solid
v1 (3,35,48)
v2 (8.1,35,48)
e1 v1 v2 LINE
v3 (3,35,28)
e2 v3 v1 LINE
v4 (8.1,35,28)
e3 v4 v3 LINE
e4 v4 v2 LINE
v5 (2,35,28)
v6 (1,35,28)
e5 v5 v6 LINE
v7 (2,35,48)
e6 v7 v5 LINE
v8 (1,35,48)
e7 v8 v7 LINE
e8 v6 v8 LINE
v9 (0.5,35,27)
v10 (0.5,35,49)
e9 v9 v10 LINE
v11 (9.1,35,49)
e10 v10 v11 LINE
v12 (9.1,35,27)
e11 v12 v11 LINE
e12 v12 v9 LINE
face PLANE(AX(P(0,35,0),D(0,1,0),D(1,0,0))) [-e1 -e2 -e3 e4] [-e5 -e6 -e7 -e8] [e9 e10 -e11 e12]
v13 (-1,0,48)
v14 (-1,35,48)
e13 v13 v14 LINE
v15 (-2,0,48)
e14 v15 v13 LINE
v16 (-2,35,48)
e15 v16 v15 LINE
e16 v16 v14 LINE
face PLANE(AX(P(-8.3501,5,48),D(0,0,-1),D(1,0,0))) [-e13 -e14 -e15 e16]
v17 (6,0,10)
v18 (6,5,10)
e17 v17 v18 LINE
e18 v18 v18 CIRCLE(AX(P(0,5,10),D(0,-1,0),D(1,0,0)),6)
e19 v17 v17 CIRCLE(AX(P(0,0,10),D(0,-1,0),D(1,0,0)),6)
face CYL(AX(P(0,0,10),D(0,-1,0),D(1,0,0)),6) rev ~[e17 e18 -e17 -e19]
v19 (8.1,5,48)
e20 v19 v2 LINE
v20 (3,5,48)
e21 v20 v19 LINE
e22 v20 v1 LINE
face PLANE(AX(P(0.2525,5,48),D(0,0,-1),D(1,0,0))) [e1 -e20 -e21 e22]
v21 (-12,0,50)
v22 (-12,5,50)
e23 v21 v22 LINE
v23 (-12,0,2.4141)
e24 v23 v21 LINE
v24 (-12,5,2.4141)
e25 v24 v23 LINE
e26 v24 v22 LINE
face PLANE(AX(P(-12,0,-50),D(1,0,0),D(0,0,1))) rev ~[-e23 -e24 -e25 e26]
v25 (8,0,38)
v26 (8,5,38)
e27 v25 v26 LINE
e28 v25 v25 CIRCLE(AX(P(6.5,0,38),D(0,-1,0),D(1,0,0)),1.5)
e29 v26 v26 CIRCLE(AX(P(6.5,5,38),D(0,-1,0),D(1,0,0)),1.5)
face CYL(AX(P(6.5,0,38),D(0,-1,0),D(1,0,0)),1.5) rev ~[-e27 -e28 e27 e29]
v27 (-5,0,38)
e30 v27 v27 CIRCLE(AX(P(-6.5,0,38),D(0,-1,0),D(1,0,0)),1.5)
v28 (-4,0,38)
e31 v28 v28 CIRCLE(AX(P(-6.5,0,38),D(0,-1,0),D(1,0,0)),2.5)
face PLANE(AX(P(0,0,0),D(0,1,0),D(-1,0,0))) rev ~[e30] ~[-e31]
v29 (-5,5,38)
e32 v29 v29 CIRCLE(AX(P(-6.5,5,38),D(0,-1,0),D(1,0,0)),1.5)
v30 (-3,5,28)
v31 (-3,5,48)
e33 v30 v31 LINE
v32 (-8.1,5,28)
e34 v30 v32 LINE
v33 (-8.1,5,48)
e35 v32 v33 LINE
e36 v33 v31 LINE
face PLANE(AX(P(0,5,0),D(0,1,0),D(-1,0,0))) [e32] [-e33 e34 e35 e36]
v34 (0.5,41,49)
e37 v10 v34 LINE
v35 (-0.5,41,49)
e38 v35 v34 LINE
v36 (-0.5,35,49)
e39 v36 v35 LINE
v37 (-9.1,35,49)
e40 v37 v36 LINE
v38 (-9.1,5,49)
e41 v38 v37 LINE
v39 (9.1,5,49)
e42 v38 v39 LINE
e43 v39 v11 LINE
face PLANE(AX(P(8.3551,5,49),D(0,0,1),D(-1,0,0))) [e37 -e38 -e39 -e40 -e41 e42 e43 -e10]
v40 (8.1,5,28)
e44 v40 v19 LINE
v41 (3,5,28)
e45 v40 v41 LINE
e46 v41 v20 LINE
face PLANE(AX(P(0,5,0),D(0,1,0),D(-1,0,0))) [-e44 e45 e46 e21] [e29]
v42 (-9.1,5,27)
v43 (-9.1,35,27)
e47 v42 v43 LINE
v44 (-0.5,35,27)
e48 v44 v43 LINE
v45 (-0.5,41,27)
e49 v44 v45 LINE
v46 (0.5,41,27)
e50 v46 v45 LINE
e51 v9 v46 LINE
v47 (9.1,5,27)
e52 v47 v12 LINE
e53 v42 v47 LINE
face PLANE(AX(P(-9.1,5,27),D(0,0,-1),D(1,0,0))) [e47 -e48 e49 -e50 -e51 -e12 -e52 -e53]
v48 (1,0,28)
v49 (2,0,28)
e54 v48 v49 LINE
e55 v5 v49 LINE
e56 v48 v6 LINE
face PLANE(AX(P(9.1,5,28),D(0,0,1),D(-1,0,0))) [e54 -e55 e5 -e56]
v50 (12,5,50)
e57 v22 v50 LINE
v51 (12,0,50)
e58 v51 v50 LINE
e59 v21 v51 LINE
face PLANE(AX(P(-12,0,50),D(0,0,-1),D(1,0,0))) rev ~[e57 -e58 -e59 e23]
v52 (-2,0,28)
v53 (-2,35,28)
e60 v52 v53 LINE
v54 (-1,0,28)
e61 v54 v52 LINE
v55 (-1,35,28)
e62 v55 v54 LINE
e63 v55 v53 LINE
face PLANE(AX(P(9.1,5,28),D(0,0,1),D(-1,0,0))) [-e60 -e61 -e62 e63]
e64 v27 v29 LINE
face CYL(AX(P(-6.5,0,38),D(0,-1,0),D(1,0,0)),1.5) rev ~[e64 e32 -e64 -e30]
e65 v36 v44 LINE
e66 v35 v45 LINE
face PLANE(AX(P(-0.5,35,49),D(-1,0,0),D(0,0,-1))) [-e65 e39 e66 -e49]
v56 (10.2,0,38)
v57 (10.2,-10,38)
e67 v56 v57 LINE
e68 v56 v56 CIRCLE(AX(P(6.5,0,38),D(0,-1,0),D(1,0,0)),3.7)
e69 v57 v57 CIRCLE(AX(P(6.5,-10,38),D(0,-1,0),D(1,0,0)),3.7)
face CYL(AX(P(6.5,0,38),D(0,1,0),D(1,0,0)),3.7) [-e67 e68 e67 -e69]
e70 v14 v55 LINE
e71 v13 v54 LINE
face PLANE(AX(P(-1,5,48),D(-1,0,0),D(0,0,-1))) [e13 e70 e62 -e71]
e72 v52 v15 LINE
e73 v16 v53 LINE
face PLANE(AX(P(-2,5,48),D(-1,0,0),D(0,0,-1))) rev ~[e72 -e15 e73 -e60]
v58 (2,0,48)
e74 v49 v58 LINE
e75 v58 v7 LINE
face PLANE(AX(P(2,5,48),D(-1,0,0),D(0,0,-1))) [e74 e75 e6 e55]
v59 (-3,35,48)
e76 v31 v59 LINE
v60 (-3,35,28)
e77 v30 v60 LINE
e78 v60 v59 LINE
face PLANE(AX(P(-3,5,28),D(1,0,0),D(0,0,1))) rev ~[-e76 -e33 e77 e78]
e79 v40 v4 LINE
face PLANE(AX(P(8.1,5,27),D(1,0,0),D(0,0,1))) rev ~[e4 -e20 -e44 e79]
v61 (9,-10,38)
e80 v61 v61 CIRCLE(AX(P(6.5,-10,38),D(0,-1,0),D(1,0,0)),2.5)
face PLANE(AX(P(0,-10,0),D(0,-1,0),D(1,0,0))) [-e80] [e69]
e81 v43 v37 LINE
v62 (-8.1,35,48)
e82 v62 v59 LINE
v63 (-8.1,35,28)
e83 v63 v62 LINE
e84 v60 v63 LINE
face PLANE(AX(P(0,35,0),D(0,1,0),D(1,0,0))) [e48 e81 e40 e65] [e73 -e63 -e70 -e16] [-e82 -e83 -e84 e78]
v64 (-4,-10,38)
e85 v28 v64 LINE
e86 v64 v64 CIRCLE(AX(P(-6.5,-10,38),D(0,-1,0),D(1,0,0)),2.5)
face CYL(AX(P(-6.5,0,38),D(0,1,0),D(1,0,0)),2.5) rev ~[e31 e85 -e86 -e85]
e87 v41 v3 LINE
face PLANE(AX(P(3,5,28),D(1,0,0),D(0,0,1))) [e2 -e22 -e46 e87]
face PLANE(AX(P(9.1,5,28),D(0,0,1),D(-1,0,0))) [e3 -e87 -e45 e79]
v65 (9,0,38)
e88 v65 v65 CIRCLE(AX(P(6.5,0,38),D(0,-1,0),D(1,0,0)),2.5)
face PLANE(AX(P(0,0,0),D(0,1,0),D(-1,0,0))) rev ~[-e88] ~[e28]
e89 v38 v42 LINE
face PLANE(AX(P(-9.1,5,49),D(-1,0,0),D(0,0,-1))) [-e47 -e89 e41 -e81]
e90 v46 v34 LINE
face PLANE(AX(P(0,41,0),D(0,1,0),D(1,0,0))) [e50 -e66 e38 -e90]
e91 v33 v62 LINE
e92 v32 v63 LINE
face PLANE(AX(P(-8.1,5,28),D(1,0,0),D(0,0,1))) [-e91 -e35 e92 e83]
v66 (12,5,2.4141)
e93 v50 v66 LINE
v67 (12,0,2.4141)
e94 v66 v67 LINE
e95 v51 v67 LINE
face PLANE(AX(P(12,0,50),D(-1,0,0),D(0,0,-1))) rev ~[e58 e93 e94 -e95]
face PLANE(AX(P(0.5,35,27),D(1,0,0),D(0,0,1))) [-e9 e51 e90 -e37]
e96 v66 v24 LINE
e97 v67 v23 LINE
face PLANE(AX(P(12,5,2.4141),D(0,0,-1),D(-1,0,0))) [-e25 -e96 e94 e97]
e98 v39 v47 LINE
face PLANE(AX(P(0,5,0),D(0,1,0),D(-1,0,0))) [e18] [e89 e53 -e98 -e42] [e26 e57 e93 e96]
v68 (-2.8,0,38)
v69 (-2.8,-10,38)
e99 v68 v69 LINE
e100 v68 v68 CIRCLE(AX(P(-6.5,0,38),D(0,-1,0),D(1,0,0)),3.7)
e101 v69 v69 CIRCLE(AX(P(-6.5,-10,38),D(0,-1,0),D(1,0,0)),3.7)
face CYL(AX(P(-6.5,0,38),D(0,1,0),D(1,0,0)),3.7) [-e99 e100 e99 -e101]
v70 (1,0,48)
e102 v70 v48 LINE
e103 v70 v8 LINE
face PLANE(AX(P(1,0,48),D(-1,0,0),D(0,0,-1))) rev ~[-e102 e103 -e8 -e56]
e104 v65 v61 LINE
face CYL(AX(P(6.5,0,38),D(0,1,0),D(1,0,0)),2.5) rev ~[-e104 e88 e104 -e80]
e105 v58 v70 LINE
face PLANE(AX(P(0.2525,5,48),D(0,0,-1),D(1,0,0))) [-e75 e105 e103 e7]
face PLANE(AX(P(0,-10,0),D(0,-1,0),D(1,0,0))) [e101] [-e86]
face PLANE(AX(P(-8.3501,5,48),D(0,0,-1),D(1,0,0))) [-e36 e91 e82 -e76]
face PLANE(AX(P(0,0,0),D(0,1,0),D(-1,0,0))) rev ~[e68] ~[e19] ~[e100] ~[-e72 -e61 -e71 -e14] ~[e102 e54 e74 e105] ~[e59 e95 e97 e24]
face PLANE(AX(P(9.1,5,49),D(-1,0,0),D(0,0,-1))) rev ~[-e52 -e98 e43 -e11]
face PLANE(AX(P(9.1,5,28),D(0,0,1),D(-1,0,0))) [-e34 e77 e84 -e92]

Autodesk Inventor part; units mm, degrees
ref_plane "YZ Plane" through (0, 0, 0) normal (1, 0, 0) x (0, 1, 0)
ref_plane "XZ Plane" through (0, 0, 0) normal (0, 1, 0) x (-1, 0, 0)
sketch "Sketch1" plane through (0, 0, 0) normal (0, 1, 0) x (-1, 0, 0)
  line L0 (12, 50) -> (-12, 50)
  line L1 (-12, 50) -> (-12, -50)
  line L2 (-12, -50) -> (12, -50)
  line L3 (12, -50) -> (12, 50)
  line L4 (12, 50) -> (-12, -50) construction
  line L5 (-12, 50) -> (12, -50) construction
  point P0 (0, 0)
  dimension "d0" = 24
  dimension "d1" = 100
  dimension "d135" = 50
extrude "Extrusion1" add sketch "Sketch1" along normal blind 5
sketch "Sketch3" plane through (0, 5, 0) normal (0, 1, 0) x (1, 0, 0)
  line L0 (-0.2475, -27) -> (0.2525, -27)
  line L1 (0.2525, -27) -> (0.2525, -49)
  line L2 (0.2525, -49) -> (-0.2475, -49)
  line L3 (-0.2475, -49) -> (-0.2475, -27)
  line L4 (12, -50) -> (12, 50) projected
  line L5 (-12, 50) -> (-12, -50) projected
  line L6 (-12, -50) -> (12, -50) projected
  point P0 (0, 0)
  dimension "d24" = 0.5
  dimension "d25" = 11.7475
  dimension "d26" = 22
  dimension "d97" = 11.7525
  dimension "d113" = 1
extrude "Extrusion3" add sketch "Sketch3" along normal blind 30
sketch "Sketch4" plane through (0, 5, 0) normal (0, 1, 0) x (1, 0, 0)
  line L0 (-9.1, -27) -> (9.1, -27)
  line L1 (9.1, -27) -> (9.1, -28)
  line L2 (9.1, -28) -> (-9.1, -28)
  line L3 (-9.1, -28) -> (-9.1, -27)
  line L4 (12, -50) -> (12, 50) projected
  line L5 (-12, 50) -> (-12, -50) projected
  line L6 (-12, -50) -> (12, -50) projected
  point P0 (0, 0)
  dimension "d29" = 1
  dimension "d30" = 2.9
  dimension "d31" = 2.9
  dimension "d114" = 22
extrude "Extrusion4" add sketch "Sketch4" along normal blind 30
sketch "Sketch7" plane through (0, 5, 0) normal (0, 1, 0) x (1, 0, 0)
  line L0 (9.1, -27) -> (8.1, -27)
  line L1 (8.1, -27) -> (8.1, -49)
  line L2 (8.1, -49) -> (9.1, -49)
  line L3 (9.1, -49) -> (9.1, -27)
  line L4 (12, -50) -> (12, 50) projected
  point P0 (0, 0)
  dimension "d46" = 22
  dimension "d47" = 2.9
  dimension "d48" = 1
extrude "Extrusion7" add sketch "Sketch7" along normal blind 30
sketch "Sketch8" plane through (0, 5, 0) normal (0, 1, 0) x (1, 0, 0)
  line L0 (-9.1, -28) -> (-8.1, -28)
  line L1 (-8.1, -28) -> (-8.1, -49)
  line L2 (-8.1, -49) -> (-9.1, -49)
  line L3 (-9.1, -49) -> (-9.1, -28)
  line L4 (-12, 50) -> (-12, -50) projected
  point P0 (0, 0)
  dimension "d51" = 21
  dimension "d52" = 2.9
  dimension "d53" = 1
extrude "Extrusion8" add sketch "Sketch8" along normal blind 30
sketch "Sketch9" plane through (0, 5, 0) normal (0, 1, 0) x (1, 0, 0)
  line L0 (-8.3501, -48) -> (-0.2475, -48)
  line L1 (-0.2475, -48) -> (-0.2475, -49)
  line L2 (-0.2475, -49) -> (-8.3501, -49)
  line L3 (-8.3501, -49) -> (-8.3501, -48)
  line L4 (-0.2475, -49) -> (-0.2475, -27) projected
  line L5 (-12, -50) -> (12, -50) projected
  point P0 (0, 0)
  point P1 (-0.2475, -28)
  dimension "d56" = 8.1026
  dimension "d57" = 1
  dimension "d58" = 0
  dimension "d59" = 1
extrude "Extrusion9" add sketch "Sketch9" along normal blind 30
sketch "Sketch10" plane through (0, 5, 0) normal (0, 1, 0) x (1, 0, 0)
  line L0 (0.2525, -48) -> (8.3551, -48)
  line L1 (8.3551, -48) -> (8.3551, -49)
  line L2 (8.3551, -49) -> (0.2525, -49)
  line L3 (0.2525, -49) -> (0.2525, -48)
  line L4 (-12, -50) -> (12, -50) projected
  line L5 (0.2525, -27) -> (0.2525, -49) projected
  point P0 (0, 0)
  point P1 (0.2525, -28)
  dimension "d62" = 8.1026
  dimension "d63" = 1
  dimension "d64" = 1
  dimension "d65" = 0
extrude "Extrusion10" add sketch "Sketch10" along normal blind 30
sketch "Sketch11" plane through (0, 5, 0) normal (0, 1, 0) x (1, 0, 0)
  point P0 (0, 0)
sketch "Sketch12" plane through (0, 0, 0) normal (0, -1, 0) x (1, 0, 0)
  circle A0 centre (4.5, 43) radius 3.25
  line L0 (12, 50) -> (12, -50) projected
  circle A1 centre (-4.5, 43) radius 3.25
  line L1 (-12, -50) -> (-12, 50) projected
  line L2 (-12, 50) -> (12, 50) projected
  point P0 (0, 0)
  dimension "d69" = 6.5
  dimension "d70" = 7.5
  dimension "d72" = 6.5
  dimension "d73" = 7.5
  dimension "d74" = 7
  dimension "d75" = 7
extrude "Extrusion11" add sketch "Sketch12" along normal blind 20
sketch "Sketch15" plane through (4.5, -20, 43) normal (0, -1, 0) x (1, 0, 0)
  point P0 (-4.5, -43)
extrude "Extrusion12" [suppressed]
sketch "Sketch16" plane through (-4.5, -20, 43) normal (0, -1, 0) x (1, 0, 0)
  point P0 (4.5, -43)
extrude "Extrusion13" [suppressed]
ref_plane "Work Plane1" through (-12, 0, -50) normal (0, -1, 0) x (1, 0, 0)
split body "Split1" result two bodies by plane through (-12, 0, -50) normal (0, -1, 0) first body at (7.2144, -13.3333, 42.5589) (-1.7856, -13.3333, 42.5589)
split "Split2" plane through (-12, 0, -50) removes the side toward (0, -1, 0)
sketch "Sketch20" plane through (0, 0, 0) normal (0, -1, 0) x (1, 0, 0)
  line L0 (-1, 28) -> (-2, 28)
  line L1 (-2, 28) -> (-2, 48)
  line L2 (-2, 48) -> (-1, 48)
  line L3 (-1, 48) -> (-1, 28)
  line L4 (1, 28) -> (2, 28)
  line L5 (2, 28) -> (2, 48)
  line L6 (2, 48) -> (1, 48)
  line L7 (1, 48) -> (1, 28)
  line L8 (-12, -50) -> (-12, 50) projected
  line L9 (12, 50) -> (12, -50) projected
  line L10 (-12, 50) -> (12, 50) projected
  point P0 (0, 0)
  dimension "d84" = 11
  dimension "d85" = 11
  dimension "d86" = 1
  dimension "d87" = 1
  dimension "d88" = 20
  dimension "d89" = 2
extrude "Extrusion14" cut sketch "Sketch20" against normal blind 25.4 bodies 3
sketch "Sketch25" plane through (0, 0, 0) normal (0, -1, 0) x (1, 0, 0)
  circle A0 centre (0, 10) radius 6
  line L0 (12, -50) -> (-12, -50) projected
  point P0 (0, 0)
  dimension "d109" = 12
  dimension "d110" = 60
extrude "Extrusion18" cut sketch "Sketch25" against normal blind 25.4 bodies 3
sketch "Sketch26" plane through (0, 5, 0) normal (0, 1, 0) x (1, 0, 0)
  point P0 (0, 0)
sketch "Sketch27" plane through (-1, 0, 48) normal (0, 0, -1) x (-1, 0, 0)
  point P0 (-1, 0)
sketch "Sketch28" plane through (0, 5, 0) normal (0, 1, 0) x (1, 0, 0)
  point P0 (0, 0)
sketch "Sketch29" plane through (0, 0, 0) normal (0, -1, 0) x (1, 0, 0)
  circle A0 centre (-6.5, 38) radius 1.5
  circle A1 centre (6.5, 38) radius 1.5
  line L0 (-12, 50) -> (12, 50) projected
  line L1 (-12, -50) -> (-12, 50) projected
  line L2 (12, 50) -> (12, -50) projected
  point P0 (0, 0)
  dimension "d121" = 3
  dimension "d122" = 3
  dimension "d123" = 12
  dimension "d124" = 12
  dimension "d125" = 5.5
  dimension "d126" = 5.5
extrude "Extrusion19" cut sketch "Sketch29" against normal blind 25.4 bodies 3
sketch "Sketch30" plane through (0, 35, 0) normal (0, 1, 0) x (1, 0, 0)
  point P0 (0, 0)
sketch "Sketch31" plane through (0, 5, 0) normal (0, 1, 0) x (1, 0, 0)
  line L0 (-1, -28) -> (1, -28)
  line L1 (1, -28) -> (1, -48)
  line L2 (1, -48) -> (-1, -48)
  line L3 (-1, -48) -> (-1, -28)
  line L4 (-0.2475, -28) -> (-1, -28) projected
  line L5 (-1, -28) -> (-1, -48) projected
  line L6 (1, -48) -> (1, -28) projected
  line L7 (0.2525, -48) -> (1, -48) projected
  point P0 (0, 0)
  dimension "d129" = 0
  dimension "d130" = 0
  dimension "d131" = 0
  dimension "d132" = 0
extrude "Extrusion20" add sketch "Sketch31" along normal blind 30 bodies 3
sketch "Sketch32" plane through (0, 0, 0) normal (0, -1, 0) x (1, 0, 0)
  point P0 (0, 0)
sketch "Sketch33" plane through (0, 0, 0) normal (0, -1, 0) x (1, 0, 0)
  point P0 (0, 0)
sketch "Sketch34" plane through (0, 0, 0) normal (0, -1, 0) x (1, 0, 0)
  point P0 (0, 0)
sketch "Sketch35" plane through (0, 5, 0) normal (0, 1, 0) x (1, 0, 0)
  point P0 (0, 0)
sketch "Sketch36" plane through (0, 5, 0) normal (0, 1, 0) x (1, 0, 0)
  point P0 (0, 0)
sketch "Sketch37" plane through (0, 5, 0) normal (0, 1, 0) x (1, 0, 0)
  point P0 (0, 0)
sketch "Sketch38" plane through (0, 5, 0) normal (0, 1, 0) x (1, 0, 0)
  point P0 (0, 0)
sketch "Sketch39" plane through (0, 5, 0) normal (0, 1, 0) x (1, 0, 0)
  point P0 (0, 0)
sketch "Sketch40" plane through (0, 5, 0) normal (0, 1, 0) x (1, 0, 0)
  line L0 (2, -28) -> (3, -28)
  line L1 (3, -28) -> (3, -48)
  line L2 (3, -48) -> (2, -48)
  line L3 (2, -48) -> (2, -28)
  line L4 (2, -48) -> (8.1, -48) projected
  line L5 (8.1, -28) -> (2, -28) projected
  point P0 (0, 0)
  dimension "d136" = 0
  dimension "d137" = 0
  dimension "d138" = 1
  dimension "d139" = 0
extrude "Extrusion21" add sketch "Sketch40" along normal blind 30 bodies 3
sketch "Sketch41" plane through (0, 5, 0) normal (0, 1, 0) x (1, 0, 0)
  line L0 (-2, -28) -> (-3, -28)
  line L1 (-3, -28) -> (-3, -48)
  line L2 (-3, -48) -> (-2, -48)
  line L3 (-2, -48) -> (-2, -28)
  line L4 (-2, -28) -> (-8.1, -28) projected
  line L5 (-2, -48) -> (-2, -28) projected
  line L6 (-8.1, -48) -> (-2, -48) projected
  point P0 (0, 0)
  dimension "d142" = 0
  dimension "d143" = 0
  dimension "d144" = 0
  dimension "d145" = 1
extrude "Extrusion22" add sketch "Sketch41" along normal blind 30 bodies 3
sketch "Sketch42" plane through (0, 35, 0) normal (0, 1, 0) x (1, 0, 0)
  point P0 (0, 0)
sketch "Sketch43" plane through (0, 35, 0) normal (0, 1, 0) x (1, 0, 0)
  line L0 (9.1, -27) -> (-9.1, -27) projected
  line L1 (-9.1, -49) -> (9.1, -49) projected
  line L2 (-0.5, -27) -> (0.5, -27)
  line L3 (0.5, -27) -> (0.5, -49)
  line L4 (0.5, -49) -> (-0.5, -49)
  line L5 (-0.5, -49) -> (-0.5, -27)
  line L6 (1, -48) -> (1, -28) projected
  point P0 (0, 0)
  dimension "d148" = 1
  dimension "d149" = 0.5
extrude "baffle" add sketch "Sketch43" along normal blind 6 bodies 3
sketch "Sketch45" plane through (0, 0, 0) normal (0, -1, 0) x (1, 0, 0)
  circle A0 centre (-6.5, 38) radius 2.5
  circle A1 centre (-6.5, 38) radius 1.5 projected
  circle A2 centre (-6.5, 38) radius 3.7
  line L0 (-12, 50) -> (12, 50) projected
  line L1 (0, 50) -> (0, 16)
  circle A3 centre (0, 10) radius 6 projected
  circle A4 centre (6.5, 38) radius 2.5
  circle A5 centre (6.5, 38) radius 3.7
  point P0 (0, 0)
  dimension "d155" = 5
  dimension "d156" = 1.2
extrude "Extrusion25" add sketch "Sketch45" along normal blind 10 contours A2 | A5 bodies 3
sketch "Sketch46" plane through (0, 5, 0) normal (0, 1, 0) x (1, 0, 0)
  line L0 (12, 50) -> (-12, 50) projected
  line L1 (12, -50) -> (12, 50) projected
  line L2 (-12, 50) -> (12, 50)
  line L3 (12, 50) -> (12, -2.4141)
  line L4 (12, -2.4141) -> (-12, -2.4141)
  line L5 (-12, -2.4141) -> (-12, 50)
  point P0 (0, 0)
extrude "Extrusion26" cut sketch "Sketch46" against normal through all bodies 3
properties part number "jtd_lid4_20160910"
